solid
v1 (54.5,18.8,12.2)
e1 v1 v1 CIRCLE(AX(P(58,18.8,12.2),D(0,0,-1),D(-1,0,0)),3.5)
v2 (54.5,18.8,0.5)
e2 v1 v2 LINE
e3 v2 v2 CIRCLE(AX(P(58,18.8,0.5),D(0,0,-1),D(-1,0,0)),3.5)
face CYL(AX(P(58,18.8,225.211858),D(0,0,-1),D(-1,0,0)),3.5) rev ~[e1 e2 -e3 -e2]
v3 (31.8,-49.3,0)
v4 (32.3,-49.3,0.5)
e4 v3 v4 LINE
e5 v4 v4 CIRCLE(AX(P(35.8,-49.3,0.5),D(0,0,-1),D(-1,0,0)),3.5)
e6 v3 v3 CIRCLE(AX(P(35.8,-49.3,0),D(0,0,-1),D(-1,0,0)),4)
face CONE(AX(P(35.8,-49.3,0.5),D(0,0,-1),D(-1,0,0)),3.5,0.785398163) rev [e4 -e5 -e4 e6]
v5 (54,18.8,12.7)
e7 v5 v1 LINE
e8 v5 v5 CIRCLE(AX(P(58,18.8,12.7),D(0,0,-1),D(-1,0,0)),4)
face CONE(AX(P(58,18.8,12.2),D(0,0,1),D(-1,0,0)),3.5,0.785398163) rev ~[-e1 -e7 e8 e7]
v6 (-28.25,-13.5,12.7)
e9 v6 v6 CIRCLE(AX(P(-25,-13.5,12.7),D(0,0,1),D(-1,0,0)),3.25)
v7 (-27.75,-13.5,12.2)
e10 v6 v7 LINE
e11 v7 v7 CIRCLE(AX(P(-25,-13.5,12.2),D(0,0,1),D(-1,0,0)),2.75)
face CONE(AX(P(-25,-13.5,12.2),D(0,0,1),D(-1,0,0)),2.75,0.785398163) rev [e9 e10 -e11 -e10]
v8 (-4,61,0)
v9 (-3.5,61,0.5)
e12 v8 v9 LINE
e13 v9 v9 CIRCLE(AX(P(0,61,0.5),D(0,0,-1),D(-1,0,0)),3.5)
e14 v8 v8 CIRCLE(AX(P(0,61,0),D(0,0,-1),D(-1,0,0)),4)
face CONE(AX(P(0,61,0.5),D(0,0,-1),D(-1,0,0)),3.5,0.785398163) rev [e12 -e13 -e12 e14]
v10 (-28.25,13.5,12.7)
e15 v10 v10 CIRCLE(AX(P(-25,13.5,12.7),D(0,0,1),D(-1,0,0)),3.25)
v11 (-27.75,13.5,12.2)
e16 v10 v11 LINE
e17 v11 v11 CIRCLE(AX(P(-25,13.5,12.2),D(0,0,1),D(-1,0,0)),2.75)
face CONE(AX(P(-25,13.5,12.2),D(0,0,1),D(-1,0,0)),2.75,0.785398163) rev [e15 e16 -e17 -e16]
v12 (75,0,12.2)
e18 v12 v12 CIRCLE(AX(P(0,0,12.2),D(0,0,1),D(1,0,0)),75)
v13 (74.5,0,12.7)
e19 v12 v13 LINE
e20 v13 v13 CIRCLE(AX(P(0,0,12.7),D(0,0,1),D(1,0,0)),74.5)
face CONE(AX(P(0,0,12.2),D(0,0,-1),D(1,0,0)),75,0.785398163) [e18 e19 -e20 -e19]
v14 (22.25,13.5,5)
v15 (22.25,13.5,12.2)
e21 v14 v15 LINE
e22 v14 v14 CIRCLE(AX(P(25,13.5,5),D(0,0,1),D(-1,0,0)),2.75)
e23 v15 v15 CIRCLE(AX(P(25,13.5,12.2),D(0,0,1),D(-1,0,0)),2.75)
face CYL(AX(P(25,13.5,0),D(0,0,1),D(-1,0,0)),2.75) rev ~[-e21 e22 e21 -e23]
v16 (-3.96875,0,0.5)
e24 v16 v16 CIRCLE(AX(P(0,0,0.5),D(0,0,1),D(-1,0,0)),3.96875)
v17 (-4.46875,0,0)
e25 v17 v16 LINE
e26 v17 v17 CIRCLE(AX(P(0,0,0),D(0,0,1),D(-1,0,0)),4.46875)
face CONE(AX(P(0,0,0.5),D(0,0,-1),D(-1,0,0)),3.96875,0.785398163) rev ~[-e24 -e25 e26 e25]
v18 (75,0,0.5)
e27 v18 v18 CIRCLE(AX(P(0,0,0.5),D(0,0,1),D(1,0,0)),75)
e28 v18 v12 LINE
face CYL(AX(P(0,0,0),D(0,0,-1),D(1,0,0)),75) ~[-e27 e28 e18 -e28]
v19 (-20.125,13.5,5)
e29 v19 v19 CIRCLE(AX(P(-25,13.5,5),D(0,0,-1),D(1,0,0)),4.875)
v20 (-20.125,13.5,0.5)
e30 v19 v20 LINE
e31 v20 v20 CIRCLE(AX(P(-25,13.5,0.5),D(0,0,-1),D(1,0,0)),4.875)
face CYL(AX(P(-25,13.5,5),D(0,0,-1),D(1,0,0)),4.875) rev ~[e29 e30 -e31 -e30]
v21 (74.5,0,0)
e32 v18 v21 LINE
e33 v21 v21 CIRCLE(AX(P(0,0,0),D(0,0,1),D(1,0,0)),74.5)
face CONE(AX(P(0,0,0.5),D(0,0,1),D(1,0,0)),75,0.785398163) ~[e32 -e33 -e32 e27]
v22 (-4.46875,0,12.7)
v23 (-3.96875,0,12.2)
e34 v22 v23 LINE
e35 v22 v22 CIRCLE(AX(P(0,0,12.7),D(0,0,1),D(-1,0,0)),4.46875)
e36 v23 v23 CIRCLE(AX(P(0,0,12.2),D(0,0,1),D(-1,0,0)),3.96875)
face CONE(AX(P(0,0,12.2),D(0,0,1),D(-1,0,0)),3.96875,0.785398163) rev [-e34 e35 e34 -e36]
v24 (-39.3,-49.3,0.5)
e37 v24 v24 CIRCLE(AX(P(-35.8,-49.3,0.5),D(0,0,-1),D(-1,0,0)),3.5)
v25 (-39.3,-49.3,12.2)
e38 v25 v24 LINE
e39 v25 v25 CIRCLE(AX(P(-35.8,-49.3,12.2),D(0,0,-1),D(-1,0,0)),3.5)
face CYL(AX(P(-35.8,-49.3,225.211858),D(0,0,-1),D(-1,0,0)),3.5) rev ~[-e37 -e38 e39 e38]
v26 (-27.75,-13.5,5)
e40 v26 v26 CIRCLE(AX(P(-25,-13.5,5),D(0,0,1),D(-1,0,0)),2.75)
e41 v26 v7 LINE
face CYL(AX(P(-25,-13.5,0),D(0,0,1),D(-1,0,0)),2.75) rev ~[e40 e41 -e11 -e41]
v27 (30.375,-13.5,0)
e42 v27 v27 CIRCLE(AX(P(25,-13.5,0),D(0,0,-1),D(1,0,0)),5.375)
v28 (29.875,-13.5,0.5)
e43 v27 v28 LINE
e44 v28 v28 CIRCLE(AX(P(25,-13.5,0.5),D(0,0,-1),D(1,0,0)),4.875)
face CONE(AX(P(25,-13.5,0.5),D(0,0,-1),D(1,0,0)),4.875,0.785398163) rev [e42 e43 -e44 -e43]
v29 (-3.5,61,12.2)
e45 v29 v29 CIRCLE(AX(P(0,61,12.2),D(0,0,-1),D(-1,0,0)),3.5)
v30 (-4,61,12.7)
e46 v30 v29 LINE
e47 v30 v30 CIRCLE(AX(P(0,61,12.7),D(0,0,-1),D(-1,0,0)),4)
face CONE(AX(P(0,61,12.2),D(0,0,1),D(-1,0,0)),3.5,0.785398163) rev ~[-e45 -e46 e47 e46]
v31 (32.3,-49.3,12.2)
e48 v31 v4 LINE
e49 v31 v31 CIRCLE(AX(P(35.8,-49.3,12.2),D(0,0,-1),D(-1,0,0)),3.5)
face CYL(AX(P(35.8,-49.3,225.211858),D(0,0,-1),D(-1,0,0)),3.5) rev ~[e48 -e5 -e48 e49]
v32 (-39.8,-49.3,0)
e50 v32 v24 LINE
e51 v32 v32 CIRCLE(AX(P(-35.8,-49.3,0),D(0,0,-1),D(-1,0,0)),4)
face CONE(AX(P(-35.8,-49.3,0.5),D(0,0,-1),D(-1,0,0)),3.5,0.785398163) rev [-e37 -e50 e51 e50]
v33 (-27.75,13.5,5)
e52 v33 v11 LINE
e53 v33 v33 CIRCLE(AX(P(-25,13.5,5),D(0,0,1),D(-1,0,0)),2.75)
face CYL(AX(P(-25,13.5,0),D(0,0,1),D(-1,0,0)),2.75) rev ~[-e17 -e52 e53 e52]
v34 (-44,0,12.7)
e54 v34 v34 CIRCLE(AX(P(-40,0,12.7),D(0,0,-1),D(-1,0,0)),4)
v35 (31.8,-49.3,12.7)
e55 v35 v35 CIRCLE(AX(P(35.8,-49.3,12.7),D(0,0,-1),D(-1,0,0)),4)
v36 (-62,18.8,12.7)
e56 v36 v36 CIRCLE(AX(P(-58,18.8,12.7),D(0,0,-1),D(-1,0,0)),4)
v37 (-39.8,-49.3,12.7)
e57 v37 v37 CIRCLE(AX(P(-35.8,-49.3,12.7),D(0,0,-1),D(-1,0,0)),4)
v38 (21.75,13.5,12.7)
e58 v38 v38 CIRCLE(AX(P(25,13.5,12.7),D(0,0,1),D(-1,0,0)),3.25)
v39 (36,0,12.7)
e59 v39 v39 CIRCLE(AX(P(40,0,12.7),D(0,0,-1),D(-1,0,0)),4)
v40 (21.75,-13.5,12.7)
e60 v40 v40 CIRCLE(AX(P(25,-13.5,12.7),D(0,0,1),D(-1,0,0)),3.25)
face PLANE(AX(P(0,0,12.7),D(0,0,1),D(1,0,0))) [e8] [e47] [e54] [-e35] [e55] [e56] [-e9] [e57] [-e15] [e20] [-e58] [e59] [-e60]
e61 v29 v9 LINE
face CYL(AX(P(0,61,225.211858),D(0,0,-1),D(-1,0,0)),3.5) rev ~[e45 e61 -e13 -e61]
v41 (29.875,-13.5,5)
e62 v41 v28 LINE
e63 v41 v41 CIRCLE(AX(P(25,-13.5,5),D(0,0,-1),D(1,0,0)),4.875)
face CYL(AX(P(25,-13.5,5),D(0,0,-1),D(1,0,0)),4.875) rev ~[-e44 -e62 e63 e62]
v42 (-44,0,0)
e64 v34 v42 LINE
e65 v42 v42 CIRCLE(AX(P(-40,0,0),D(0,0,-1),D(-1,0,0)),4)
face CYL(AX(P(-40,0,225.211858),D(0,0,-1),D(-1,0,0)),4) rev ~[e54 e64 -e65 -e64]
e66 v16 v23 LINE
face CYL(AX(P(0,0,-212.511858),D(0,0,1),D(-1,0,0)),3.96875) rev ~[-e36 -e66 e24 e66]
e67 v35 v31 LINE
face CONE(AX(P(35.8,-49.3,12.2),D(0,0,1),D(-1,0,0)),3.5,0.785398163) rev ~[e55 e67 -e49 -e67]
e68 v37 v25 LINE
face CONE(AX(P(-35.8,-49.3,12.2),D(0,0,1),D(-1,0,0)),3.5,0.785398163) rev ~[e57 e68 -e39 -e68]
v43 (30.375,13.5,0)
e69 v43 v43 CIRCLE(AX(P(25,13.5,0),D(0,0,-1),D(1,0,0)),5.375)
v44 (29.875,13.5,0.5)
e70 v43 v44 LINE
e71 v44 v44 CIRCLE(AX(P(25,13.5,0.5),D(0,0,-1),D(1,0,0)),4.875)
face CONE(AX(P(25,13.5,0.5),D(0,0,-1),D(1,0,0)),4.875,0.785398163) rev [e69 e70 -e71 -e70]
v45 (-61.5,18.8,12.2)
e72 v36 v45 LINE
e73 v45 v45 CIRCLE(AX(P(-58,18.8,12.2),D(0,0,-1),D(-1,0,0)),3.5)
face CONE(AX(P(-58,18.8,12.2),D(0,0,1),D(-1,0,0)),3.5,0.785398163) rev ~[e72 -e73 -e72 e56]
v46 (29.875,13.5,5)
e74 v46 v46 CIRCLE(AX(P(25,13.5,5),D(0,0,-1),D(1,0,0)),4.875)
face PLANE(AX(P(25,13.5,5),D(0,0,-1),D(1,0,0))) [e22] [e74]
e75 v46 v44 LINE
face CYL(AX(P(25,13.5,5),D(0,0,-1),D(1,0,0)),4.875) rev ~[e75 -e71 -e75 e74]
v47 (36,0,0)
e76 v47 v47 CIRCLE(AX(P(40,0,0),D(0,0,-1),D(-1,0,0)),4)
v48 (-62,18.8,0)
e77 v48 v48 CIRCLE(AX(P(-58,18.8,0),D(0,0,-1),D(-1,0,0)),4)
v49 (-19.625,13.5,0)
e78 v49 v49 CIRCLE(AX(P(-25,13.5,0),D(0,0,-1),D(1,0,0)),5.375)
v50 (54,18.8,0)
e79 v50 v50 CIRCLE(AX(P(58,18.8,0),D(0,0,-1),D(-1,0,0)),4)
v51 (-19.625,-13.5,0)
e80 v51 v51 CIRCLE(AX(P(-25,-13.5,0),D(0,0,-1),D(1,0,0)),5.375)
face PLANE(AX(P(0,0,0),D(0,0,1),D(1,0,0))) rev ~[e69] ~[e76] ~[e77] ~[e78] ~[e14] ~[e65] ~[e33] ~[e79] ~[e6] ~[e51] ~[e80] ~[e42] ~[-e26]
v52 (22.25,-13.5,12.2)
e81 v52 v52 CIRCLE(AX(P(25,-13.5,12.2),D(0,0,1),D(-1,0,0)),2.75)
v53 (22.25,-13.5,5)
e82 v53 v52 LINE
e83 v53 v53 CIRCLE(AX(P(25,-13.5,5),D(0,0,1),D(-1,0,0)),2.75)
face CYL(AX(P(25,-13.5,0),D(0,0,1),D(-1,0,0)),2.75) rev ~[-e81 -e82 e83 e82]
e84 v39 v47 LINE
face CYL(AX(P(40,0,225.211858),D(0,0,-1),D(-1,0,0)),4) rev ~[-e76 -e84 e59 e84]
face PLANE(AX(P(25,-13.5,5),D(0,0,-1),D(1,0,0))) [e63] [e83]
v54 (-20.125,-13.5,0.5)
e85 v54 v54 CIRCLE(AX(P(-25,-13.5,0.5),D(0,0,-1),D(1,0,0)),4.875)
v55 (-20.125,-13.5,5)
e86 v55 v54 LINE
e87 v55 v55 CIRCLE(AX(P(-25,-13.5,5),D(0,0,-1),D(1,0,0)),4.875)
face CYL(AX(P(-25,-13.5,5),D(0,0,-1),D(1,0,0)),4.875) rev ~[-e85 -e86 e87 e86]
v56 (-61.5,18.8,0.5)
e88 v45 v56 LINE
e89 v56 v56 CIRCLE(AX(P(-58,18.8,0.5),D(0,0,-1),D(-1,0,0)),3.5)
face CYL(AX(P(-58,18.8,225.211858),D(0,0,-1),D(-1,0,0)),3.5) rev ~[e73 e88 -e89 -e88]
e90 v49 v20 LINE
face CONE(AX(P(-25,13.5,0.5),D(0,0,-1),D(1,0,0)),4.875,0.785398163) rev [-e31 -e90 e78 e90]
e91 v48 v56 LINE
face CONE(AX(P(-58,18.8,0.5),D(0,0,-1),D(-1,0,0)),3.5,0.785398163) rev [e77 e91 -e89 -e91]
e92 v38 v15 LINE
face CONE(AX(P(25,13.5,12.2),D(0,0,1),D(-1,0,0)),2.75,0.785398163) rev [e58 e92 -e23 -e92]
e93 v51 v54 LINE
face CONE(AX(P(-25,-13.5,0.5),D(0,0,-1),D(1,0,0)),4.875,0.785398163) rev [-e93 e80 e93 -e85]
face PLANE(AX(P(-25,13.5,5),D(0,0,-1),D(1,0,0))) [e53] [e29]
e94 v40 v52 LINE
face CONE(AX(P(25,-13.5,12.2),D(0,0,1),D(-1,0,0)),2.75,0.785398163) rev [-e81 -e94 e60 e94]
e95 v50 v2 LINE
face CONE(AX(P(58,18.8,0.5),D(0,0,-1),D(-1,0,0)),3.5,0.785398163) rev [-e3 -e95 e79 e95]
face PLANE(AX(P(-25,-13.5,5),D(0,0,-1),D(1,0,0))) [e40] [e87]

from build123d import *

# Parameters (mm, degrees)
F0_R           = 75
F1_DEPTH       = 12.7
F2_D           = 5.5
F2_CBORE_D     = 9.75
F2_CBORE_DEPTH = 5
F4_D           = 7
F5_D           = 7.9375
F6_SIZE        = 0.5
F8_D           = 8


# Not quite as in the source:
# - a length typed as a fraction of an inch, garbled in the dataset ("3 / 203.2 mm" for 3/8 in), is restored


with BuildPart() as f1:
    # F0 (on Top) → F1 (new body)
    with BuildSketch(Plane.XY):
        Circle(F0_R)
    extrude(amount=F1_DEPTH)

    # F2 (through all)
    with Locations(Plane(origin=(0, 0, 0), x_dir=(1, 0, 0), z_dir=(0, 0, -1))):
        with Locations((-25, 13.5), (25, 13.5), (-25, -13.5), (25, -13.5)):
            CounterBoreHole(F2_D / 2, F2_CBORE_D / 2, F2_CBORE_DEPTH)

    # F4 (through all)
    with Locations(Plane.XY.offset(12.7)):
        with Locations((0, 61), (58, 18.8), (-58, 18.8), (-35.8, -49.3), (35.8, -49.3)):
            Hole(F4_D / 2)

    # F5 (through all)
    with Locations(Plane(origin=(0, 0, 0), x_dir=(1, 0, 0), z_dir=(0, 0, -1))):
        with Locations((0, 0)):
            Hole(F5_D / 2)

    # F6
    f6_edges = [f1.edges().sort_by_distance(p)[0] for p in [
        (-75, 0, 0),
        (-39.3, -49.3, 0),
        (-29.875, -13.5, 0),
        (32.3, -49.3, 0),
        (20.125, -13.5, 0),
        (-3.96875, 0, 0),
        (-61.5, 18.8, 0),
        (-29.875, 13.5, 0),
        (20.125, 13.5, 0),
        (54.5, 18.8, 0),
        (-3.5, 61, 0),
        (-75, 0, 12.7),
        (-39.3, -49.3, 12.7),
        (-27.75, -13.5, 12.7),
        (32.3, -49.3, 12.7),
        (22.25, -13.5, 12.7),
        (-3.96875, 0, 12.7),
        (-61.5, 18.8, 12.7),
        (-27.75, 13.5, 12.7),
        (22.25, 13.5, 12.7),
        (54.5, 18.8, 12.7),
        (-3.5, 61, 12.7),
    ]]
    chamfer(f6_edges, length=F6_SIZE)

    # F8 (through all)
    with Locations(Plane.XY.offset(12.7)):
        with Locations((-40, 0), (40, 0)):
            Hole(F8_D / 2)


solid = f1.part
